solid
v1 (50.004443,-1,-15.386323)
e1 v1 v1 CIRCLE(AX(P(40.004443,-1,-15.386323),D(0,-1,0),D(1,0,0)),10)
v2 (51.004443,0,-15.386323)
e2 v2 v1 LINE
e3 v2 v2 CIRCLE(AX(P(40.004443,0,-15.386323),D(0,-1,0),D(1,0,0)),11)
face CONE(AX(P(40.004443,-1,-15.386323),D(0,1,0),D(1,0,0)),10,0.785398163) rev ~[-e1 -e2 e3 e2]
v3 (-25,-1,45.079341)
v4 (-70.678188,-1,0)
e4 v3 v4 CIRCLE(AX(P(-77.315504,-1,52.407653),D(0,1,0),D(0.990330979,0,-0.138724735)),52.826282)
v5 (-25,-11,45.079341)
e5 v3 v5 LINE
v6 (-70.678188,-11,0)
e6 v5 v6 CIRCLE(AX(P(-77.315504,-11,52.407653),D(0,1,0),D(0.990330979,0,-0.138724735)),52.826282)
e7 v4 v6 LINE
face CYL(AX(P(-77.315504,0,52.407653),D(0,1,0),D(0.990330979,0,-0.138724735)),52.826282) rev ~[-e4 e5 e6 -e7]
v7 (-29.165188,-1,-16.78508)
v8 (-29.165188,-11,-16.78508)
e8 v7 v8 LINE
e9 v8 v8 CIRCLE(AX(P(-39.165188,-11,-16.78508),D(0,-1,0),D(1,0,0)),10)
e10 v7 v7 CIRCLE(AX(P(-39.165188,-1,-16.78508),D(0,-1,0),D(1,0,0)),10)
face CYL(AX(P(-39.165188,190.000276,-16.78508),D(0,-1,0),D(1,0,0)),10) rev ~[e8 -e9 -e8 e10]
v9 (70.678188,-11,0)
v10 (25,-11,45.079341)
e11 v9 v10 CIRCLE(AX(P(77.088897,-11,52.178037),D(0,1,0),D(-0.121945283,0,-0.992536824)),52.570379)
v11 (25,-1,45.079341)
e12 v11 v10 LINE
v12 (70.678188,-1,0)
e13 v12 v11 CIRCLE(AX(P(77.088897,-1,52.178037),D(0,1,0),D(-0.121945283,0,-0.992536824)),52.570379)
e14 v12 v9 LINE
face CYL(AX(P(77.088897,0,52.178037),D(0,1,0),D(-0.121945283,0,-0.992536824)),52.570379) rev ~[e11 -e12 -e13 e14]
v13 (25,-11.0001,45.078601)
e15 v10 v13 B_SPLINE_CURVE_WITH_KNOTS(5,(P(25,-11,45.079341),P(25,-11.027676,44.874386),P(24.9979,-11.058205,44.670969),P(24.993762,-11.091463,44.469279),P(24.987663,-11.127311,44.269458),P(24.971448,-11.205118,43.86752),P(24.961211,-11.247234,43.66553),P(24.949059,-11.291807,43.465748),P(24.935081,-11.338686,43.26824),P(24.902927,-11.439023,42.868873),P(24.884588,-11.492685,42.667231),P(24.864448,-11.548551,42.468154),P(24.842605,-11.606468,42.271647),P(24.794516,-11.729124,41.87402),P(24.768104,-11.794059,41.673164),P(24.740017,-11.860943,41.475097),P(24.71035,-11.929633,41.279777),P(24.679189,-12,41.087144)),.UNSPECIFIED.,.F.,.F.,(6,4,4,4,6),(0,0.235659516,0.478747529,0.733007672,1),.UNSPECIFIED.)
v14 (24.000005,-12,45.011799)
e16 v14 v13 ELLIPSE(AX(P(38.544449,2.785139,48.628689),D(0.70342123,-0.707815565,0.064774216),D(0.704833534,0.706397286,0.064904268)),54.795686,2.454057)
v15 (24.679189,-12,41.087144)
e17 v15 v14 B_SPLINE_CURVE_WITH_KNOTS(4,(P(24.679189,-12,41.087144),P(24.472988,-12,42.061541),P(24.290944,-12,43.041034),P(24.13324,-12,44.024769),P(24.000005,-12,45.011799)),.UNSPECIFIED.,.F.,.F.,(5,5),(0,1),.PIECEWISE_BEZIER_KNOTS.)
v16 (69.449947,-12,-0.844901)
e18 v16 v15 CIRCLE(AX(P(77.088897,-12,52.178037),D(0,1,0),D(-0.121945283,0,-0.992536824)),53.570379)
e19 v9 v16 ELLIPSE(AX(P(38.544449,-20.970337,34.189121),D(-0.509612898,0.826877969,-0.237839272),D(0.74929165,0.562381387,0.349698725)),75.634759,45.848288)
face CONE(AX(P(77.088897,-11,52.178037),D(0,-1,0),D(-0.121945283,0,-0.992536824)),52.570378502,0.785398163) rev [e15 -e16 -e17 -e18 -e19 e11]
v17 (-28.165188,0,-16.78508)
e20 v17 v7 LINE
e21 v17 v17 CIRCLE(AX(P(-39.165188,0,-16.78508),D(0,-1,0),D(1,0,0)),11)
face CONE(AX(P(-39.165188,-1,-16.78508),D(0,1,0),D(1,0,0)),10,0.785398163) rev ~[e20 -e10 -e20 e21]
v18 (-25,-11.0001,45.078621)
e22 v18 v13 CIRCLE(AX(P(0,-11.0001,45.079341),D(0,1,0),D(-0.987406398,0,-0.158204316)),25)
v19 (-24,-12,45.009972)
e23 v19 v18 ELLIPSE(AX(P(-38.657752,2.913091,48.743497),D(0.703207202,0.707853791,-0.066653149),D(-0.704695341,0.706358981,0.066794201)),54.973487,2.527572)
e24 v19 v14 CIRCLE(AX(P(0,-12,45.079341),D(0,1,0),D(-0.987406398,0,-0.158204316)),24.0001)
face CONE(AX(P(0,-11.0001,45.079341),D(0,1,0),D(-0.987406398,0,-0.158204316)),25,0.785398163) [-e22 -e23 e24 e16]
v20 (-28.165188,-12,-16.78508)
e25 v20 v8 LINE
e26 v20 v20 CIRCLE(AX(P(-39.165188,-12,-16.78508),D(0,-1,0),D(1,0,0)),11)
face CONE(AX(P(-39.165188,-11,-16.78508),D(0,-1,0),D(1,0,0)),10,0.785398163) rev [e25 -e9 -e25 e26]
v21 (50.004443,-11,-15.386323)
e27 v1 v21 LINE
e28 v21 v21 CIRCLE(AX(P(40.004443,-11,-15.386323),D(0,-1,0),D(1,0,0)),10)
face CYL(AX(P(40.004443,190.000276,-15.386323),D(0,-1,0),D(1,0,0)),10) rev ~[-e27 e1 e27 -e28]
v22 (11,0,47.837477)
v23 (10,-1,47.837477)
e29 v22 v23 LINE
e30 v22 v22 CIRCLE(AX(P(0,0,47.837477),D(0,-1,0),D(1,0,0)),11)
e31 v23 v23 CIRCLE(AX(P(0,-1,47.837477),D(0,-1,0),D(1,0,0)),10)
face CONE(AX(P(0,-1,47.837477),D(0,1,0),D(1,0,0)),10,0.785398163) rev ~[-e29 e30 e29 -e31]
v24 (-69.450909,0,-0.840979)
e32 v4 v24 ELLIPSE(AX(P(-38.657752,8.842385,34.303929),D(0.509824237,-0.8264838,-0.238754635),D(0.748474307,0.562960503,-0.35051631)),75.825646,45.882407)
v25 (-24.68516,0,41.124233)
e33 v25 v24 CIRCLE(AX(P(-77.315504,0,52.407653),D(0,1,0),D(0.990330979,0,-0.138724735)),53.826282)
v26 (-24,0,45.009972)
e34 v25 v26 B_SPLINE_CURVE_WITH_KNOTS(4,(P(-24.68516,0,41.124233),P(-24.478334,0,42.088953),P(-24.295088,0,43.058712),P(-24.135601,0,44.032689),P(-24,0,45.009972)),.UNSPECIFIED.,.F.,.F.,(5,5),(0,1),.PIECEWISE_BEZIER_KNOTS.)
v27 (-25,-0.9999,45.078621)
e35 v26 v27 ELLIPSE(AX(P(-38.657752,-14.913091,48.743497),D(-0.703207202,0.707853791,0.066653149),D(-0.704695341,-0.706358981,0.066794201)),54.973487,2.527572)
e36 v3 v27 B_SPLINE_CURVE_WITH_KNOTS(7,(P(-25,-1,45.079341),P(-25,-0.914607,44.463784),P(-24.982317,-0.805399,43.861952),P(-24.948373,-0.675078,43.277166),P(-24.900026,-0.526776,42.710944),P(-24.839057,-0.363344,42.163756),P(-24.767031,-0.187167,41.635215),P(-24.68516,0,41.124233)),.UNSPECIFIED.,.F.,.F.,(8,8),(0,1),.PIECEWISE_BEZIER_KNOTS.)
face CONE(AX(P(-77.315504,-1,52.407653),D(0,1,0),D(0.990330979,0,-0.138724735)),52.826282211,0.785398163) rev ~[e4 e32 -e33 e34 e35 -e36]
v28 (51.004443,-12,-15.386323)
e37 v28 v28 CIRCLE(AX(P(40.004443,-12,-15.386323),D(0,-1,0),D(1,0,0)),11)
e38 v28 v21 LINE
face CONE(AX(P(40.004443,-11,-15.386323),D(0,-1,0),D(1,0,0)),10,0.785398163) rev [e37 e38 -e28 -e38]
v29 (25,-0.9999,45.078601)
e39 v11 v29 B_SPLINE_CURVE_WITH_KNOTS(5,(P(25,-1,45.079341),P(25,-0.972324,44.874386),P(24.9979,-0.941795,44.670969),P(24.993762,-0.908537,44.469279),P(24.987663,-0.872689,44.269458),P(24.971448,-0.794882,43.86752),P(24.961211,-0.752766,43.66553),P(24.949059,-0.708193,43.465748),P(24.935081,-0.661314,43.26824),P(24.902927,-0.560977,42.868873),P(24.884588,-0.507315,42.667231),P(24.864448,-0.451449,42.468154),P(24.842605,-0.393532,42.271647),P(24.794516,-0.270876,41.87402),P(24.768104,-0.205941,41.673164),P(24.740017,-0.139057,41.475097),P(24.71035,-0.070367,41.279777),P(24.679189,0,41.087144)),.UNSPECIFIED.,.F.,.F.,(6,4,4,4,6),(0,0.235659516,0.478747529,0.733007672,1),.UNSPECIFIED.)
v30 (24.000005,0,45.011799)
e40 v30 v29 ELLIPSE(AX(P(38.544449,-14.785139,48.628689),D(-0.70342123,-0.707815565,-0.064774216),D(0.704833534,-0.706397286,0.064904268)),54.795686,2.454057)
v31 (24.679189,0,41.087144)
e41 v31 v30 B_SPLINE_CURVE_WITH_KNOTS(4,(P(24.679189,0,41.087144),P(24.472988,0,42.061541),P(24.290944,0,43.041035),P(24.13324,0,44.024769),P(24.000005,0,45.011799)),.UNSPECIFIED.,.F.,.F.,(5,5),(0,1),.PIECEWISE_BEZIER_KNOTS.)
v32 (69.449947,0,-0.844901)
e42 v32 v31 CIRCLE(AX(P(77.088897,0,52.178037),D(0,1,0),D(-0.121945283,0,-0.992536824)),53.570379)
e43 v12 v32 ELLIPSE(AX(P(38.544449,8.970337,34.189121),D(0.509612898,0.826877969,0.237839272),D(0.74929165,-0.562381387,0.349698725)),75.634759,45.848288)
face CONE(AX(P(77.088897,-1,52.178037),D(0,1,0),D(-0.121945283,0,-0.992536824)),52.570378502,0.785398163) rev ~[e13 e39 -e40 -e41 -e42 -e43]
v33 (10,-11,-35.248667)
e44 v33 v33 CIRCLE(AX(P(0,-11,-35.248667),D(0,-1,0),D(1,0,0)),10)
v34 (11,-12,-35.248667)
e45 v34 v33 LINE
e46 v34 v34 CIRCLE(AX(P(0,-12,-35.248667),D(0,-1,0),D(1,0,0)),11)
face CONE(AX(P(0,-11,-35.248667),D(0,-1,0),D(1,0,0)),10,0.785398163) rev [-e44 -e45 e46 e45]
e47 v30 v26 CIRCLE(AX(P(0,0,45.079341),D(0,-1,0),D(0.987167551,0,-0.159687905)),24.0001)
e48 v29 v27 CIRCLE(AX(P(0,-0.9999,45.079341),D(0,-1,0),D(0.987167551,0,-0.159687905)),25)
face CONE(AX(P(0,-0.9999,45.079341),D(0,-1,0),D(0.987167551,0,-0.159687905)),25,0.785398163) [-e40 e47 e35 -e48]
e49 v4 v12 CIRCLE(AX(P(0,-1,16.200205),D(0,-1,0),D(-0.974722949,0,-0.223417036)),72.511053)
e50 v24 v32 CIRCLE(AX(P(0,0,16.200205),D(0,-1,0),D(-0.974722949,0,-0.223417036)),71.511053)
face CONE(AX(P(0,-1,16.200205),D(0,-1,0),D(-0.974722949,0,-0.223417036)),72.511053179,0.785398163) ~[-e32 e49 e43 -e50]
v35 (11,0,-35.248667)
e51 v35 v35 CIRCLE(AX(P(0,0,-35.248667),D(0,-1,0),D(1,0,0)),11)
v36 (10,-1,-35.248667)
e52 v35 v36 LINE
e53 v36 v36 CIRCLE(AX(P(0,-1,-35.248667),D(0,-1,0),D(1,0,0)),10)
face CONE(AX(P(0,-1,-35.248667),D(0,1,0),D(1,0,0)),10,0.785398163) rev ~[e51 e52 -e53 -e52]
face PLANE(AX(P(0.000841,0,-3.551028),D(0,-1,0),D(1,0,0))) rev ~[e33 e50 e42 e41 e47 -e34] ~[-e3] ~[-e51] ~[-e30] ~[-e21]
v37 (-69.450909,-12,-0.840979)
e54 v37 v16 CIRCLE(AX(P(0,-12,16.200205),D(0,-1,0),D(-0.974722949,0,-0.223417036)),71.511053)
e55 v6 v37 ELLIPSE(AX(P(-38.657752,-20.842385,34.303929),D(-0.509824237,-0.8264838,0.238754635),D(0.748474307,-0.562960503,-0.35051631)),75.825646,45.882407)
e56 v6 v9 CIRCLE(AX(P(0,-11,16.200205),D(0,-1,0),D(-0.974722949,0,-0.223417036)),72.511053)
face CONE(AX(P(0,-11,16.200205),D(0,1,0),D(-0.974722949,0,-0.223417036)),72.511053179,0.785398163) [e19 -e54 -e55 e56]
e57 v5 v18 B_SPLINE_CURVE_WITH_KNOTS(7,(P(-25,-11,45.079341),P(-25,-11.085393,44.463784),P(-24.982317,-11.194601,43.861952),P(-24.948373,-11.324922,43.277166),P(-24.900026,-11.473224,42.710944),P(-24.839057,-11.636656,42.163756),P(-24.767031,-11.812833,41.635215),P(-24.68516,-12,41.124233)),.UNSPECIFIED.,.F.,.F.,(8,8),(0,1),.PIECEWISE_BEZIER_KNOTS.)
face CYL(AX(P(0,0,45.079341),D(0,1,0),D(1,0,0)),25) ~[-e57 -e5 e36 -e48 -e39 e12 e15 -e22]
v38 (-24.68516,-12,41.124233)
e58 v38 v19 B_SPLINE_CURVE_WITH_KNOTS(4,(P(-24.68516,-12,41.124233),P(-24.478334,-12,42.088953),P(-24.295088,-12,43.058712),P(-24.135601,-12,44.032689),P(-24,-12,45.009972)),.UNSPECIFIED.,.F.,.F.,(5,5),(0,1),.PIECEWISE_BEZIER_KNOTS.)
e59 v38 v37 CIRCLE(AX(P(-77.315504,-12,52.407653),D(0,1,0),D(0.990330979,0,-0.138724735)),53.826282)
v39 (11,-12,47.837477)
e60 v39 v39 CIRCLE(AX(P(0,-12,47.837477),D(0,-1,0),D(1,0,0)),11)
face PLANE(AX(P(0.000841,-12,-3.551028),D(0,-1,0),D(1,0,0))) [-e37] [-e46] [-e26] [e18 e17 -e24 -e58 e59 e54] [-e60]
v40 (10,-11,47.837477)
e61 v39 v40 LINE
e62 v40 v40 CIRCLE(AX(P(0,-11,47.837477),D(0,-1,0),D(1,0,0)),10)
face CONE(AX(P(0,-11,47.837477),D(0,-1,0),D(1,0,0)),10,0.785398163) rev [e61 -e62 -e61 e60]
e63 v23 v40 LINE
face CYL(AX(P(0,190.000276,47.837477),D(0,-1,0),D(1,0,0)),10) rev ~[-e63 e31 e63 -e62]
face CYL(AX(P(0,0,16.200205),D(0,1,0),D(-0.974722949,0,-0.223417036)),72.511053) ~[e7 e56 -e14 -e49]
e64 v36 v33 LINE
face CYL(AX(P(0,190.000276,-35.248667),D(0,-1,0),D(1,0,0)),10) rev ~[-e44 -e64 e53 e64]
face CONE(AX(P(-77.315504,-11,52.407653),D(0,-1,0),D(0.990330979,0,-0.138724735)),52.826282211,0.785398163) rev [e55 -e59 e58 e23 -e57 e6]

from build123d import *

# Parameters (mm, degrees)
F1_DEPTH   = 12
F3_D       = 20
F4_C1_SIZE = 1
F4_C2_SIZE = 1
F4_C3_SIZE = 1
F4_C4_SIZE = 1
F4_C5_SIZE = 1
F4_C6_SIZE = 1
F4_C7_SIZE = 1
F4_C8_SIZE = 0.9999
F5_C1_SIZE = 1
F5_C2_SIZE = 1
F5_C3_SIZE = 1
F5_C4_SIZE = 1
F5_C5_SIZE = 1
F5_C6_SIZE = 1
F5_C7_SIZE = 1
F5_C8_SIZE = 0.9999


# Not quite as in the source:
# - a fillet or chamfer is up to 0.001 mm smaller than in the source, because OpenCascade refuses the exact size


with BuildPart() as f1:
    # F0 (on Front) → F1 (new body)
    with BuildSketch(Plane.XZ):
        with BuildLine():
            ThreePointArc((-70.6781876117, 0), (0, -56.3108485805), (70.6781876117, 0))
            ThreePointArc((70.6781876117, 0), (40.1621081353, 14.7607018174), (25, 45.079341326))
            ThreePointArc((25, 45.079341326), (0, 20.079341326), (-25, 45.079341326))
            ThreePointArc((-25, 45.079341326), (-40.2089612492, 14.808177341), (-70.6781876117, 0))
        make_face()
        with BuildLine():
            ThreePointArc((-25, 45.079341326), (0, 20.079341326), (25, 45.079341326))
            Line((25, 45.079341326), (-25, 45.079341326))
        make_face()
        with BuildLine():
            Line((-25, 45.079341326), (25, 45.079341326))
            ThreePointArc((25, 45.079341326), (0, 70.079341326), (-25, 45.079341326))
        make_face()
    extrude(amount=F1_DEPTH)

    # F3 (through all)
    with Locations(Plane(origin=(0, 0, 0), x_dir=(-1, 0, 0), z_dir=(0, 1, 0))):
        with Locations((-40.0044433773, -15.3863234445), (0, -35.2486670017), (39.1651876271, -16.7850796133), (0, 47.8374771774)):
            Hole(F3_D / 2)

    # F4: chamfer of 1 on 8 edges, made by hand

    # F4_c1
    f4_c1_edges = [f1.edges().sort_by_distance(p)[0] for p in [
        (40.1621081353, 0, 14.7607018174),
    ]]
    chamfer(f4_c1_edges, length=F4_C1_SIZE)

    # F4_c2
    f4_c2_edges = [f1.edges().sort_by_distance(p)[0] for p in [
        (-0.5029833863, 0, -56.3091040511),
    ]]
    chamfer(f4_c2_edges, length=F4_C2_SIZE)

    # F4_c3
    f4_c3_edges = [f1.edges().sort_by_distance(p)[0] for p in [
        (-39.8532973479, 0, 15.1625303947),
    ]]
    chamfer(f4_c3_edges, length=F4_C3_SIZE)

    # F4_c4
    f4_c4_edges = [f1.edges().sort_by_distance(p)[0] for p in [
        (10, 0, -35.2486670017),
    ]]
    chamfer(f4_c4_edges, length=F4_C4_SIZE)

    # F4_c5
    f4_c5_edges = [f1.edges().sort_by_distance(p)[0] for p in [
        (-29.1651876271, 0, -16.7850796133),
    ]]
    chamfer(f4_c5_edges, length=F4_C5_SIZE)

    # F4_c6
    f4_c6_edges = [f1.edges().sort_by_distance(p)[0] for p in [
        (50.0044433773, 0, -15.3863234445),
    ]]
    chamfer(f4_c6_edges, length=F4_C6_SIZE)

    # F4_c7
    f4_c7_edges = [f1.edges().sort_by_distance(p)[0] for p in [
        (10, 0, 47.8374771774),
    ]]
    chamfer(f4_c7_edges, length=F4_C7_SIZE)

    # F4_c8 (size 1 in the source; OpenCascade refuses exactly that, so slightly less here)
    f4_c8_edges = [f1.edges().sort_by_distance(p)[0] for p in [
        (0, 0, 70.079341326),
    ]]
    chamfer(f4_c8_edges, length=F4_C8_SIZE)

    # F5: chamfer of 1 on 8 edges, made by hand

    # F5_c1
    f5_c1_edges = [f1.edges().sort_by_distance(p)[0] for p in [
        (40.1621081353, -12, 14.7607018174),
    ]]
    chamfer(f5_c1_edges, length=F5_C1_SIZE)

    # F5_c2
    f5_c2_edges = [f1.edges().sort_by_distance(p)[0] for p in [
        (-0.5029833863, -12, -56.3091040511),
    ]]
    chamfer(f5_c2_edges, length=F5_C2_SIZE)

    # F5_c3
    f5_c3_edges = [f1.edges().sort_by_distance(p)[0] for p in [
        (-39.8532973479, -12, 15.1625303947),
    ]]
    chamfer(f5_c3_edges, length=F5_C3_SIZE)

    # F5_c4
    f5_c4_edges = [f1.edges().sort_by_distance(p)[0] for p in [
        (10, -12, 47.8374771774),
    ]]
    chamfer(f5_c4_edges, length=F5_C4_SIZE)

    # F5_c5
    f5_c5_edges = [f1.edges().sort_by_distance(p)[0] for p in [
        (50.0044433773, -12, -15.3863234445),
    ]]
    chamfer(f5_c5_edges, length=F5_C5_SIZE)

    # F5_c6
    f5_c6_edges = [f1.edges().sort_by_distance(p)[0] for p in [
        (-29.1651876271, -12, -16.7850796133),
    ]]
    chamfer(f5_c6_edges, length=F5_C6_SIZE)

    # F5_c7
    f5_c7_edges = [f1.edges().sort_by_distance(p)[0] for p in [
        (10, -12, -35.2486670017),
    ]]
    chamfer(f5_c7_edges, length=F5_C7_SIZE)

    # F5_c8 (size 1 in the source; OpenCascade refuses exactly that, so slightly less here)
    f5_c8_edges = [f1.edges().sort_by_distance(p)[0] for p in [
        (0, -12, 70.079341326),
    ]]
    chamfer(f5_c8_edges, length=F5_C8_SIZE)


solid = f1.part
